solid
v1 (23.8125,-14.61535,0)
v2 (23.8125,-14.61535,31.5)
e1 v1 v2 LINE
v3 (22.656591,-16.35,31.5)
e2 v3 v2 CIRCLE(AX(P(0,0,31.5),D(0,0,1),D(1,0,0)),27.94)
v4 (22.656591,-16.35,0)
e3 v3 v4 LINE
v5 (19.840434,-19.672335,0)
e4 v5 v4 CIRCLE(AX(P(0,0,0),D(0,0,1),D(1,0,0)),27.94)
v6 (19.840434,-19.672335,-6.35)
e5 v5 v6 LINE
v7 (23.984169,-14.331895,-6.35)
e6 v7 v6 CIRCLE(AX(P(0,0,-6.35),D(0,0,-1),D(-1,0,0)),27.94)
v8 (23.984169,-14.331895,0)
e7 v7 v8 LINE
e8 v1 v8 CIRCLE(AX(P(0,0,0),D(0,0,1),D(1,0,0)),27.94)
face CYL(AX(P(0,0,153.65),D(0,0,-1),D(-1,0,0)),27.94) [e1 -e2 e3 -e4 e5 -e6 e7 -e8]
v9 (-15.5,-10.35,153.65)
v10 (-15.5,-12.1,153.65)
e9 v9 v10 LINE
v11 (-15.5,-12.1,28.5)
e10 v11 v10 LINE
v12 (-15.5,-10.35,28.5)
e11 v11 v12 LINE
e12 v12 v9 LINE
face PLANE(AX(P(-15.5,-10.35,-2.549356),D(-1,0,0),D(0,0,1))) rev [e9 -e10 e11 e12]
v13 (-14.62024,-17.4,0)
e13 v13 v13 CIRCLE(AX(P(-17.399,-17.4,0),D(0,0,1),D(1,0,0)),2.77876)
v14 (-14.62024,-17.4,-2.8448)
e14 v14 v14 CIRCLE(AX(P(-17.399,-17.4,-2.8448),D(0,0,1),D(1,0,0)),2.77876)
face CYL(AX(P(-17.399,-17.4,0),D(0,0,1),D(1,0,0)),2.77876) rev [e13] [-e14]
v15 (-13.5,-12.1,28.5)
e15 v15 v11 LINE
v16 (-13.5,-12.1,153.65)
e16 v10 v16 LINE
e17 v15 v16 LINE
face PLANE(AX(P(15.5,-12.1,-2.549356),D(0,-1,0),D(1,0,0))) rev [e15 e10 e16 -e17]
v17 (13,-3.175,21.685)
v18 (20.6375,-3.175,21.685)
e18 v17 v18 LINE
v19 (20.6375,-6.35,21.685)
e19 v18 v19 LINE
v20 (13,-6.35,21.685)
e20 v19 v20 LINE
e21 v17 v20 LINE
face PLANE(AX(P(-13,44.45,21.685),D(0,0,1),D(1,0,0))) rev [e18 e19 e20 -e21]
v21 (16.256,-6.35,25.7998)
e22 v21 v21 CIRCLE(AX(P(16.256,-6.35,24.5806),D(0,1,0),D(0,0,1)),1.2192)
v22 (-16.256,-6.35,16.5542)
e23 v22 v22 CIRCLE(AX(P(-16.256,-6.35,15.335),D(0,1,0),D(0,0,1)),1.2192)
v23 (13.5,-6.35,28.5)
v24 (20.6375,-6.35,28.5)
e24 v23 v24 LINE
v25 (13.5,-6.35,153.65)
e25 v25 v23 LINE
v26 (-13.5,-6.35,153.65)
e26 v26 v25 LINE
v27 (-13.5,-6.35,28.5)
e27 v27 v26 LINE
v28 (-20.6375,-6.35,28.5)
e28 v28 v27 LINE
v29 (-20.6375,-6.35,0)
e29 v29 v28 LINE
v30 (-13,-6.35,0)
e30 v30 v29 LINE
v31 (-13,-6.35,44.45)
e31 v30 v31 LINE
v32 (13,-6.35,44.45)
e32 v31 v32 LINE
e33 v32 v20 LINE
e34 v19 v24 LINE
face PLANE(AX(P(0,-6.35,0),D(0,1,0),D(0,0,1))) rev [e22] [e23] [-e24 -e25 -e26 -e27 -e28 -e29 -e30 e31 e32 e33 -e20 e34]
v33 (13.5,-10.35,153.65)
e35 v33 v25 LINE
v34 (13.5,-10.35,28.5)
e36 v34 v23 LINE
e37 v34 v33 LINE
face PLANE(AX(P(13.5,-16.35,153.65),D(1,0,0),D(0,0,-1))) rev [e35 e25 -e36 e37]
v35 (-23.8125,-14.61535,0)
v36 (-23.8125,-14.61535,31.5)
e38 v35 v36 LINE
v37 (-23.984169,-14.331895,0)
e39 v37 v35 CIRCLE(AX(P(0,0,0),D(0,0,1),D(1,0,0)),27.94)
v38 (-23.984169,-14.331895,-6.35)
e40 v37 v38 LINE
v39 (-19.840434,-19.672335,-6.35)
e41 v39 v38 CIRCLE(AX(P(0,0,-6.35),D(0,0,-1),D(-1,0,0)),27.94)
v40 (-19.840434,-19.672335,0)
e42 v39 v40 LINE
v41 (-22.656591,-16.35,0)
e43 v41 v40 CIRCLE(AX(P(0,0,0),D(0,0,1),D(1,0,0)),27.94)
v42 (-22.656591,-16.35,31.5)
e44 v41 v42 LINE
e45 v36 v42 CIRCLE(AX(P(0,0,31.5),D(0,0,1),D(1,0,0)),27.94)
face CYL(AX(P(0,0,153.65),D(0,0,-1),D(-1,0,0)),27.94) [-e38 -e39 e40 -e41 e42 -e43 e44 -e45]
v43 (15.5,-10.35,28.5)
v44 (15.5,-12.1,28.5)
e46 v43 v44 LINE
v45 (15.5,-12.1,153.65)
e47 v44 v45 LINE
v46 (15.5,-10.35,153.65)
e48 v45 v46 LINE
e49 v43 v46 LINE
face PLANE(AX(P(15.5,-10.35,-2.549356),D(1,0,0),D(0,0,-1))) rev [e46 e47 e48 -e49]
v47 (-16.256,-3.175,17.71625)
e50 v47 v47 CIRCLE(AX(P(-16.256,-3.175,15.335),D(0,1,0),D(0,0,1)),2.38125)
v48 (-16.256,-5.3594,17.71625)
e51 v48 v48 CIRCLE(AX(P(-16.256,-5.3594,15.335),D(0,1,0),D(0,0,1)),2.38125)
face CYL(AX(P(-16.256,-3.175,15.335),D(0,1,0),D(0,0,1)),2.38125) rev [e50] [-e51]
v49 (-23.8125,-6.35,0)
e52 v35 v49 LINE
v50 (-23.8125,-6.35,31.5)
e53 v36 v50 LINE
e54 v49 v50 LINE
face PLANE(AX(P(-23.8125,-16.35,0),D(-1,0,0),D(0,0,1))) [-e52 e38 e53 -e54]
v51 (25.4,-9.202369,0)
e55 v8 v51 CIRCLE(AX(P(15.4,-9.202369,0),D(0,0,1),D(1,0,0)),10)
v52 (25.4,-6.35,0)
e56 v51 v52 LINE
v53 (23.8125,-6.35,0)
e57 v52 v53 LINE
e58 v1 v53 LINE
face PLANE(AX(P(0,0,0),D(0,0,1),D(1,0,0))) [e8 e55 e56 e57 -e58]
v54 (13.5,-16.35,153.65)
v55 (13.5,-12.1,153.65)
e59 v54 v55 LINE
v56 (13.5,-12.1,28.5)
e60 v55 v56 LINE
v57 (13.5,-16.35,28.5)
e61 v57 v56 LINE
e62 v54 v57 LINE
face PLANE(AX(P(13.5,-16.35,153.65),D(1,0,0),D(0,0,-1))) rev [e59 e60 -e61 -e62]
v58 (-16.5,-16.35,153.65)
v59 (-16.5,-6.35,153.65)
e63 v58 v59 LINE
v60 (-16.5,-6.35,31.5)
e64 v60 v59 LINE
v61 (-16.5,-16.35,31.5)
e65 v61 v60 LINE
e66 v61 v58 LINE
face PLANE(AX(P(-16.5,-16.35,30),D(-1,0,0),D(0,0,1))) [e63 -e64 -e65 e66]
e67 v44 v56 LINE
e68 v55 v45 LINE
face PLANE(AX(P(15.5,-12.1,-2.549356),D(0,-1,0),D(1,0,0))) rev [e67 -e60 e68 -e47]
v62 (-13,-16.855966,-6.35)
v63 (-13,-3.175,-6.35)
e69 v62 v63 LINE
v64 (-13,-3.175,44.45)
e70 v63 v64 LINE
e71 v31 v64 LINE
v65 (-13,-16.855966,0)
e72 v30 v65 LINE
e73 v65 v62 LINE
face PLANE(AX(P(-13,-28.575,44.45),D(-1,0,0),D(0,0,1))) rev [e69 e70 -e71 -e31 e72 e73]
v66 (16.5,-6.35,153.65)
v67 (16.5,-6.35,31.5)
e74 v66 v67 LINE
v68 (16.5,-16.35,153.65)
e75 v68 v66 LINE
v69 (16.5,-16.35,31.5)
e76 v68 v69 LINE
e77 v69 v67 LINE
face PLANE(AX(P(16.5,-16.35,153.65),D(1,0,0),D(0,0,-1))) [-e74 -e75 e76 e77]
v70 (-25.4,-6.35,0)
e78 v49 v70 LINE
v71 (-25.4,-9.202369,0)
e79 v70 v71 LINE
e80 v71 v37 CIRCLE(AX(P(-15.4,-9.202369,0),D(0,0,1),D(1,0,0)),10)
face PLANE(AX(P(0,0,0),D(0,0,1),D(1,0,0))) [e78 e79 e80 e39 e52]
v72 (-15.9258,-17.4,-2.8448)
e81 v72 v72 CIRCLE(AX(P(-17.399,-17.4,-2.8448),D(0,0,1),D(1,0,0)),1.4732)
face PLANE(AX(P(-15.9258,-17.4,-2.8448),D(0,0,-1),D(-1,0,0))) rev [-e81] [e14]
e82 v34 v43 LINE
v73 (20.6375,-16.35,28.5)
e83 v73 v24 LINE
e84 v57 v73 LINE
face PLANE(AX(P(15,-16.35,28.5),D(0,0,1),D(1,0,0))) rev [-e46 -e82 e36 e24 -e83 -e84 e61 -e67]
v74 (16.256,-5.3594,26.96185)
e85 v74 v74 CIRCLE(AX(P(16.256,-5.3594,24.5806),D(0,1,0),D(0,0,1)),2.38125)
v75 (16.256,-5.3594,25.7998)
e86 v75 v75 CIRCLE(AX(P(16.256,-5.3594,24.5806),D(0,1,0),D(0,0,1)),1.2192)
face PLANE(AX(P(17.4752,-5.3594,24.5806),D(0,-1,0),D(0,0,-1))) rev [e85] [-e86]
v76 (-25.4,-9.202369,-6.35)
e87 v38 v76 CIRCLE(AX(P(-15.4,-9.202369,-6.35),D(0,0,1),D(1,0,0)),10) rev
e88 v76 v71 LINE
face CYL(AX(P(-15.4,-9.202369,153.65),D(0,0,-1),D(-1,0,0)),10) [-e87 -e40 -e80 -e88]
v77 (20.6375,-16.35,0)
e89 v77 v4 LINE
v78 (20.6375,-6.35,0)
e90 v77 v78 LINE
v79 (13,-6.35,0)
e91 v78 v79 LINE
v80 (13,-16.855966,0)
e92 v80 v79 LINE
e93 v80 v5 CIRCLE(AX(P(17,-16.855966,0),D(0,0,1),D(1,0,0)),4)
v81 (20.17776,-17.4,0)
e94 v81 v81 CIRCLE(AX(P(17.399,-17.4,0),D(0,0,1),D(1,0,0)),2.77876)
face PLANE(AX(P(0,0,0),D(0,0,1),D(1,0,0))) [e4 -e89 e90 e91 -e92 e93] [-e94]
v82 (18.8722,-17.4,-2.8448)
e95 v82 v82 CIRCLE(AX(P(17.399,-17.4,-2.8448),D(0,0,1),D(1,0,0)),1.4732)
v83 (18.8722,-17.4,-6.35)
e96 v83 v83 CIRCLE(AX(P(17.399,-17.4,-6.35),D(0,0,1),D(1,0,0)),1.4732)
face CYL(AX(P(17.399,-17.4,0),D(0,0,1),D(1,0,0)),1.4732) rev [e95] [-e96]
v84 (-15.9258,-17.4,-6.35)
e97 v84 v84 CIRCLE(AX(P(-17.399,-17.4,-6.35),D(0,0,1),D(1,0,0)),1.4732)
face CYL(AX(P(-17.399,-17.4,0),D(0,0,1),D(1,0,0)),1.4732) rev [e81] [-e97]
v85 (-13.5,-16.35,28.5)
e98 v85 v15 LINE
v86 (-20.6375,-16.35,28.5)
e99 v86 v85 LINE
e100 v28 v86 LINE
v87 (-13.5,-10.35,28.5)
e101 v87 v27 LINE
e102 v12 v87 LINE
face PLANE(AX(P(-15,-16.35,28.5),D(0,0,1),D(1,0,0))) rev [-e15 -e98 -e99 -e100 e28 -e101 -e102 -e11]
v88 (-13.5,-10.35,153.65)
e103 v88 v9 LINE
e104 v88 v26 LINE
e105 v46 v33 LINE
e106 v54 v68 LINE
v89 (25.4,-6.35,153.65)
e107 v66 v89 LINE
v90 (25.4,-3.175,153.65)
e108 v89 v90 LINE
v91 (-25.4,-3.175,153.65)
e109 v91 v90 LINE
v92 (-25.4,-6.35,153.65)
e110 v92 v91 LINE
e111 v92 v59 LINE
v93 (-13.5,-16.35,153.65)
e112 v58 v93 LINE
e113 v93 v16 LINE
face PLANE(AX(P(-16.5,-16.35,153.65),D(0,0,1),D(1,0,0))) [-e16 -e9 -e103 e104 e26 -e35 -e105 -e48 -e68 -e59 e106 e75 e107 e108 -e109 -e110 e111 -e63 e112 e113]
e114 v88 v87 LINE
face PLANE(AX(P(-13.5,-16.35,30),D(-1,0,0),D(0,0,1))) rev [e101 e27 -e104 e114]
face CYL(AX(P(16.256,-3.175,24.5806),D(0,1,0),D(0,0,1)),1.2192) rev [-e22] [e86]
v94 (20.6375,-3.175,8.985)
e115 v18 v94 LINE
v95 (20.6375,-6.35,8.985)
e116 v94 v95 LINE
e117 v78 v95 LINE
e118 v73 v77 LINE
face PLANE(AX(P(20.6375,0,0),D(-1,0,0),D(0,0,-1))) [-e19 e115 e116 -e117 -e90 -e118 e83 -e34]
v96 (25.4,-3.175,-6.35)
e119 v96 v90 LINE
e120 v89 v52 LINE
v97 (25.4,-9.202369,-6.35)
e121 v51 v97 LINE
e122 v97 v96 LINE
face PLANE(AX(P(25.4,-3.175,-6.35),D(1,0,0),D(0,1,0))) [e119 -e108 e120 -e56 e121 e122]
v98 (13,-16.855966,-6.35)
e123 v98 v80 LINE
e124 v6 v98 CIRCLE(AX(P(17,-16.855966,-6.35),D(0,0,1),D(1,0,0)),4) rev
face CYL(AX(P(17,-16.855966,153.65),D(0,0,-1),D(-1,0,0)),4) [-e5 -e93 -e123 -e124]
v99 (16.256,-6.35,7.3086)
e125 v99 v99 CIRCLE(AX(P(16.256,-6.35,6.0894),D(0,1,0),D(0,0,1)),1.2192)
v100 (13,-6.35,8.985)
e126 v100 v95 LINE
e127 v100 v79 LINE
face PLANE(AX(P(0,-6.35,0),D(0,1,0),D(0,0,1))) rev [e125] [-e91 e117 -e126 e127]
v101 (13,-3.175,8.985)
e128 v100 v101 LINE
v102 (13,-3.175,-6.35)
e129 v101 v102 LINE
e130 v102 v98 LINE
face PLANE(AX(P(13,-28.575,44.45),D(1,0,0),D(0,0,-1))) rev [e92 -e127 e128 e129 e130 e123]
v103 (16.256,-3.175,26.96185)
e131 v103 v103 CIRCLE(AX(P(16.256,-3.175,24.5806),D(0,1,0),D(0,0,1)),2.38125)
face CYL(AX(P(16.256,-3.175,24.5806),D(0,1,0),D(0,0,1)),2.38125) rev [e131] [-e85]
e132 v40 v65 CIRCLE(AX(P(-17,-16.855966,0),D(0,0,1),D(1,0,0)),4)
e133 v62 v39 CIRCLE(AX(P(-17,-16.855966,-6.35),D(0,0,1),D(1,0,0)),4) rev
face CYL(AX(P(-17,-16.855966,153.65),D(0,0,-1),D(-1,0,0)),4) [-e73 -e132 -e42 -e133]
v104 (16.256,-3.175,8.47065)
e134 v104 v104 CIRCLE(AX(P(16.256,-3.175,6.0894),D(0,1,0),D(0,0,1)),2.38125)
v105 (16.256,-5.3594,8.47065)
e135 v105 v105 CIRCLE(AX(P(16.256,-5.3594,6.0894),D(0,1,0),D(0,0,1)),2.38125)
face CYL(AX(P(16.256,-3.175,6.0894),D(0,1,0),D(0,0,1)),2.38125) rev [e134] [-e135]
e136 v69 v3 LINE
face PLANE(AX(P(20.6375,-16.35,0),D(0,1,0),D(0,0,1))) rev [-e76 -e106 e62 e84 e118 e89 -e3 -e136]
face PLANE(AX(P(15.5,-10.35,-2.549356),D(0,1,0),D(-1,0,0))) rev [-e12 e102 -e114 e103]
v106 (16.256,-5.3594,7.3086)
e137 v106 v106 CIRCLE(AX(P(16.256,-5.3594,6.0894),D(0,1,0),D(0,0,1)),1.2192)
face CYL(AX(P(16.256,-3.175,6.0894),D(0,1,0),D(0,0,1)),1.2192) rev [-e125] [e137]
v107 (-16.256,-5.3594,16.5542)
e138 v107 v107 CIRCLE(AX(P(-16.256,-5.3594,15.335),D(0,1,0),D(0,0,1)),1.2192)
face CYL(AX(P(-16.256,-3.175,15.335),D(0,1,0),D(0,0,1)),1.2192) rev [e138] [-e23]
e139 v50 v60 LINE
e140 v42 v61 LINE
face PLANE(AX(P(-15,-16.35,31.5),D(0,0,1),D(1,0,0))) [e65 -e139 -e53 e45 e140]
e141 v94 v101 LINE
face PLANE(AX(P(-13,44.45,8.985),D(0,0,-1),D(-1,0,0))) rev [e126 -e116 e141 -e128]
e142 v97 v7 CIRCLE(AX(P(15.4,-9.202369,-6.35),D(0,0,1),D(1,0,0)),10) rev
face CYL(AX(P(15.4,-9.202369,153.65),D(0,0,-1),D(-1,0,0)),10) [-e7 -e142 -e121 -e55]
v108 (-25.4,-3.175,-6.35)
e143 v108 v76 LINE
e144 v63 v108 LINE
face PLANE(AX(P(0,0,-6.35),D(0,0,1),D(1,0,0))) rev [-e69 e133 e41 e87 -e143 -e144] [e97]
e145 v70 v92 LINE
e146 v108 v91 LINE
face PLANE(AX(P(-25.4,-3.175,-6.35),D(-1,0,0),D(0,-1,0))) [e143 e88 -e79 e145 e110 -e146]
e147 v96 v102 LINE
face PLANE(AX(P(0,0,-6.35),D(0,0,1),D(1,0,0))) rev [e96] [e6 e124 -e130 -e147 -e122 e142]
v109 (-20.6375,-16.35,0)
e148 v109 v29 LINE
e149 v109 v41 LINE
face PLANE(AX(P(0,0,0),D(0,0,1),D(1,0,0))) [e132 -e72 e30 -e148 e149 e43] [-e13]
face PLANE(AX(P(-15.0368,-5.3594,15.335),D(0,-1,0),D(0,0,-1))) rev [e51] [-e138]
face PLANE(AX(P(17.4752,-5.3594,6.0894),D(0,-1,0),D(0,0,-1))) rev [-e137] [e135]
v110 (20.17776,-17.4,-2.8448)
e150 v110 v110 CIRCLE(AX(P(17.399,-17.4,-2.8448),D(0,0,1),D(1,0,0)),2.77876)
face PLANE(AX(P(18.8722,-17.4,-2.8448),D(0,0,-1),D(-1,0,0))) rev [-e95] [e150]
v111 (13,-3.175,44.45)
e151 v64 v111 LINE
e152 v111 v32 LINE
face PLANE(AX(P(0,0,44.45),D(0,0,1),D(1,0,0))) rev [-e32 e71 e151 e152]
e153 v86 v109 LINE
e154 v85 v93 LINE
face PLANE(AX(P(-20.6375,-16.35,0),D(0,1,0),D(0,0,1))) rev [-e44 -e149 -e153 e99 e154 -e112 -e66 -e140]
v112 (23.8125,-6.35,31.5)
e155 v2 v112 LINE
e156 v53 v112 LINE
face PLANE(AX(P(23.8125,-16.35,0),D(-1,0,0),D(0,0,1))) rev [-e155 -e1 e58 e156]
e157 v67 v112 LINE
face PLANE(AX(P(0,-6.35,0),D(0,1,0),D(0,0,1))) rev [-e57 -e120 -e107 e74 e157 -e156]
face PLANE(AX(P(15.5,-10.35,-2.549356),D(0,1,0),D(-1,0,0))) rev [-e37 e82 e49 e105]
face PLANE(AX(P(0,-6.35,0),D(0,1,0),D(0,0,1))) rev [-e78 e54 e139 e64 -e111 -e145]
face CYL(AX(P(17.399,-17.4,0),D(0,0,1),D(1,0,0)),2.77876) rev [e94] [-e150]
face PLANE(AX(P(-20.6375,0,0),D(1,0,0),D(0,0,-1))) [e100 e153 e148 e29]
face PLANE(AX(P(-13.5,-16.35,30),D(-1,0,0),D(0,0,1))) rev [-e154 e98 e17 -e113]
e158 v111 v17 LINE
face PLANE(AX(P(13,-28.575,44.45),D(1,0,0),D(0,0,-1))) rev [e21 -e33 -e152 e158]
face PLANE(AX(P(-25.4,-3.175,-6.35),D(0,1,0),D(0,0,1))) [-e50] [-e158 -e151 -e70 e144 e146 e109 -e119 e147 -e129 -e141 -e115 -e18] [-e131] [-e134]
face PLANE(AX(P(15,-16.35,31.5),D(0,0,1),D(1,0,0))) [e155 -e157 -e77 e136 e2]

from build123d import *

# Parameters (mm, degrees)
SKETCH1_W                                     = 50.8
SKETCH1_H                                     = 25.4
BASE_FLANGE1_DEPTH                            = 6.35
SKETCH22_W                                    = 50.8
SKETCH22_H                                    = 160
BOSS_EXTRUDE1_DEPTH                           = 3.175
GUSSET1_START                                 = -22.225
GUSSET1_DEPTH                                 = 1.5875
CBORE_FOR_4_SOCKET_HEAD_CAP_SCREW1_AT_2_COUNT = 2
CBORE_FOR_4_SOCKET_HEAD_CAP_SCREW1_AT_2_PITCH = 34.798
SKETCH12_W                                    = 26
SKETCH12_H                                    = 28.575
CUT_EXTRUDE1_DEPTH                            = 50.8
SKETCH13_W                                    = 33.6375
SKETCH13_H                                    = 12.7
CUT_EXTRUDE2_DEPTH                            = 50.8
CBORE_FOR_2_SOCKET_HEAD_CAP_SCREW1_AT_2_COUNT = 2
CBORE_FOR_2_SOCKET_HEAD_CAP_SCREW1_AT_2_PITCH = 33.801054175
CBORE_FOR_2_SOCKET_HEAD_CAP_SCREW1_AT_3_COUNT = 2
CBORE_FOR_2_SOCKET_HEAD_CAP_SCREW1_AT_3_PITCH = 33.801054175
EXTRUDE_THIN1_DEPTH                           = 10
SKETCH25_W                                    = 3.175
SKETCH25_H                                    = 31.5
EXTRUDE_THIN2_DEPTH                           = 10
SKETCH17_OUTSIDE_W                            = 86.756
SKETCH17_OUTSIDE_H                            = 61.356
SKETCH17_OUTSIDE_R                            = 27.94
CUT_EXTRUDE3_DEPTH                            = 165.504378741
FILLET1_R                                     = 10
FILLET2_R                                     = 4
SKETCH24_W                                    = 31
SKETCH24_H                                    = 1.75
CUT_EXTRUDE4_DEPTH                            = 125.15


# Read off the part's stored shape, not the designer's step: Gusset1
# Sheet-metal steps are written as plain solids
with BuildPart() as part:
    # Sketch1 → Base-Flange1 (new body)
    with BuildSketch(Plane.XY):
        with Locations((0, -15.875)):
            Rectangle(SKETCH1_W, SKETCH1_H)
    extrude(amount=-BASE_FLANGE1_DEPTH)

    # Sketch22 → Boss-Extrude1 (add)
    with BuildSketch(Plane(origin=(0, -3.175, 0), x_dir=(1, 0, 0), z_dir=(0, 1, 0))):
        with Locations((0, -73.65)):
            Rectangle(SKETCH22_W, SKETCH22_H)
    extrude(amount=-BOSS_EXTRUDE1_DEPTH)

    # Sketch11 → CBORE for #4 Socket Head Cap Screw1 (revolve, cut)
    with BuildSketch(Plane(origin=(-17.399, -17.4, 0), x_dir=(0, -1, 0), z_dir=(1, 0, 0))):
        Polygon((0, 0), (0, 6.351), (1.4732, 6.351), (1.4732, 2.8448), (2.77876, 2.8448), (2.77876, 0), align=None)
    cbore_for_4_socket_head_cap_screw1 = revolve(axis=Axis((-17.399, -17.4, 6.35), (0, 0, -1)), mode=Mode.SUBTRACT)

    # CBORE for #4 Socket Head Cap Screw1 at 2: CBORE for #4 Socket Head Cap Screw1 ×2
    with Locations(*[(i * CBORE_FOR_4_SOCKET_HEAD_CAP_SCREW1_AT_2_PITCH, 0, 0) for i in range(1, CBORE_FOR_4_SOCKET_HEAD_CAP_SCREW1_AT_2_COUNT)]):
        add(cbore_for_4_socket_head_cap_screw1, mode=Mode.SUBTRACT)

    # Sketch12 → Cut-Extrude1 (cut)
    with BuildSketch(Plane(origin=(0, 0, -6.35), x_dir=(-1, 0, 0), z_dir=(0, 0, -1))):
        with Locations((0, -14.2875)):
            Rectangle(SKETCH12_W, SKETCH12_H)
    extrude(amount=-CUT_EXTRUDE1_DEPTH, mode=Mode.SUBTRACT)


with BuildPart() as body_2:
    # Gusset1 outline → Gusset1 (new body)
    with BuildSketch(Plane.YZ.offset(GUSSET1_START)):
        Polygon((-16.35, 5), (-16.35, 0), (-6.35, 0), (-6.35, 30), (-10.35, 30), align=None)
    gusset1 = extrude(amount=GUSSET1_DEPTH)


with BuildPart() as part_1:
    add(part.part)

    # Mirror2: Gusset1 across plane
    add(gusset1.mirror(Plane(origin=(0, 0, 0), x_dir=(0, 0, 1), z_dir=(1, 0, 0))))

    # Sketch13 → Cut-Extrude2 (cut)
    with BuildSketch(Plane.XZ.offset(6.35)):
        with Locations((3.81875, 15.335)):
            Rectangle(SKETCH13_W, SKETCH13_H)
    extrude(amount=-CUT_EXTRUDE2_DEPTH, mode=Mode.SUBTRACT)

    # Sketch16 → CBORE for #2 Socket Head Cap Screw1 (revolve, cut)
    with BuildSketch(Plane(origin=(-16.256, -3.175, 15.335), x_dir=(0, 0, 1), z_dir=(1, 0, 0))):
        Polygon((0, 0), (0, 17.242569267), (1.2192, 16.51), (1.2192, 2.1844), (2.38125, 2.1844), (2.38125, 0), align=None)
    cbore_for_2_socket_head_cap_screw1 = revolve(axis=Axis((-16.256, 3.175, 15.335), (0, -1, 0)), mode=Mode.SUBTRACT)

    # CBORE for #2 Socket Head Cap Screw1 at 2: CBORE for #2 Socket Head Cap Screw1 ×2
    with Locations(*[Vector(0.9618634919315714, 0, 0.27352993051804053) * (i * CBORE_FOR_2_SOCKET_HEAD_CAP_SCREW1_AT_2_PITCH) for i in range(1, CBORE_FOR_2_SOCKET_HEAD_CAP_SCREW1_AT_2_COUNT)]):
        add(cbore_for_2_socket_head_cap_screw1, mode=Mode.SUBTRACT)

    # CBORE for #2 Socket Head Cap Screw1 at 3: CBORE for #2 Socket Head Cap Screw1 ×2
    with Locations(*[Vector(0.9618634919315714, 0, -0.2735299305180405) * (i * CBORE_FOR_2_SOCKET_HEAD_CAP_SCREW1_AT_3_PITCH) for i in range(1, CBORE_FOR_2_SOCKET_HEAD_CAP_SCREW1_AT_3_COUNT)]):
        add(cbore_for_2_socket_head_cap_screw1, mode=Mode.SUBTRACT)

    add(body_2.part)  # Extrude-Thin1 merges body 2
    # Sketch23 → Extrude-Thin1 (add)
    with BuildSketch(Plane.XZ.offset(6.35)):
        Polygon((-22.225, 28.5), (-13.5, 28.5), (-13.5, 153.65), (-16.5, 153.65), (-16.5, 31.5), (-22.225, 31.5), align=None)
        Polygon((13.5, 153.65), (13.5, 28.5), (22.225, 28.5), (22.225, 31.5), (16.5, 31.5), (16.5, 153.65), align=None)
    extrude(amount=EXTRUDE_THIN1_DEPTH)

    # Sketch25 → Extrude-Thin2 (add)
    with BuildSketch(Plane.XZ.offset(6.35)):
        with Locations((-22.225, 15.75)):
            Rectangle(SKETCH25_W, SKETCH25_H)
        with Locations((22.225, 15.75)):
            Rectangle(SKETCH25_W, SKETCH25_H)
    extrude(amount=EXTRUDE_THIN2_DEPTH)

    # Sketch17 outside → Cut-Extrude3 (cut, through all)
    with BuildSketch(Plane(origin=(0, 0, -6.35), x_dir=(-1, 0, 0), z_dir=(0, 0, -1))):
        with Locations((0, -15.875)):
            Rectangle(SKETCH17_OUTSIDE_W, SKETCH17_OUTSIDE_H)
        Circle(SKETCH17_OUTSIDE_R, mode=Mode.SUBTRACT)
    extrude(amount=-CUT_EXTRUDE3_DEPTH, mode=Mode.SUBTRACT)

    # Fillet1
    fillet1_edges = [part_1.edges().sort_by_distance(p)[0] for p in [
        (-25.4, -11.639742265, -3.175),
        (25.4, -11.639742265, -3.175),
    ]]
    fillet(fillet1_edges, radius=FILLET1_R)

    # Fillet2
    fillet2_edges = [part_1.edges().sort_by_distance(p)[0] for p in [
        (-13, -24.731429397, -3.175),
        (13, -24.731429397, -3.175),
    ]]
    fillet(fillet2_edges, radius=FILLET2_R)

    # Sketch24 → Cut-Extrude4 (cut)
    with BuildSketch(Plane.XY.offset(153.65)):
        with Locations((0, -11.225)):
            Rectangle(SKETCH24_W, SKETCH24_H)
    extrude(amount=-CUT_EXTRUDE4_DEPTH, mode=Mode.SUBTRACT)


solid = part_1.part
